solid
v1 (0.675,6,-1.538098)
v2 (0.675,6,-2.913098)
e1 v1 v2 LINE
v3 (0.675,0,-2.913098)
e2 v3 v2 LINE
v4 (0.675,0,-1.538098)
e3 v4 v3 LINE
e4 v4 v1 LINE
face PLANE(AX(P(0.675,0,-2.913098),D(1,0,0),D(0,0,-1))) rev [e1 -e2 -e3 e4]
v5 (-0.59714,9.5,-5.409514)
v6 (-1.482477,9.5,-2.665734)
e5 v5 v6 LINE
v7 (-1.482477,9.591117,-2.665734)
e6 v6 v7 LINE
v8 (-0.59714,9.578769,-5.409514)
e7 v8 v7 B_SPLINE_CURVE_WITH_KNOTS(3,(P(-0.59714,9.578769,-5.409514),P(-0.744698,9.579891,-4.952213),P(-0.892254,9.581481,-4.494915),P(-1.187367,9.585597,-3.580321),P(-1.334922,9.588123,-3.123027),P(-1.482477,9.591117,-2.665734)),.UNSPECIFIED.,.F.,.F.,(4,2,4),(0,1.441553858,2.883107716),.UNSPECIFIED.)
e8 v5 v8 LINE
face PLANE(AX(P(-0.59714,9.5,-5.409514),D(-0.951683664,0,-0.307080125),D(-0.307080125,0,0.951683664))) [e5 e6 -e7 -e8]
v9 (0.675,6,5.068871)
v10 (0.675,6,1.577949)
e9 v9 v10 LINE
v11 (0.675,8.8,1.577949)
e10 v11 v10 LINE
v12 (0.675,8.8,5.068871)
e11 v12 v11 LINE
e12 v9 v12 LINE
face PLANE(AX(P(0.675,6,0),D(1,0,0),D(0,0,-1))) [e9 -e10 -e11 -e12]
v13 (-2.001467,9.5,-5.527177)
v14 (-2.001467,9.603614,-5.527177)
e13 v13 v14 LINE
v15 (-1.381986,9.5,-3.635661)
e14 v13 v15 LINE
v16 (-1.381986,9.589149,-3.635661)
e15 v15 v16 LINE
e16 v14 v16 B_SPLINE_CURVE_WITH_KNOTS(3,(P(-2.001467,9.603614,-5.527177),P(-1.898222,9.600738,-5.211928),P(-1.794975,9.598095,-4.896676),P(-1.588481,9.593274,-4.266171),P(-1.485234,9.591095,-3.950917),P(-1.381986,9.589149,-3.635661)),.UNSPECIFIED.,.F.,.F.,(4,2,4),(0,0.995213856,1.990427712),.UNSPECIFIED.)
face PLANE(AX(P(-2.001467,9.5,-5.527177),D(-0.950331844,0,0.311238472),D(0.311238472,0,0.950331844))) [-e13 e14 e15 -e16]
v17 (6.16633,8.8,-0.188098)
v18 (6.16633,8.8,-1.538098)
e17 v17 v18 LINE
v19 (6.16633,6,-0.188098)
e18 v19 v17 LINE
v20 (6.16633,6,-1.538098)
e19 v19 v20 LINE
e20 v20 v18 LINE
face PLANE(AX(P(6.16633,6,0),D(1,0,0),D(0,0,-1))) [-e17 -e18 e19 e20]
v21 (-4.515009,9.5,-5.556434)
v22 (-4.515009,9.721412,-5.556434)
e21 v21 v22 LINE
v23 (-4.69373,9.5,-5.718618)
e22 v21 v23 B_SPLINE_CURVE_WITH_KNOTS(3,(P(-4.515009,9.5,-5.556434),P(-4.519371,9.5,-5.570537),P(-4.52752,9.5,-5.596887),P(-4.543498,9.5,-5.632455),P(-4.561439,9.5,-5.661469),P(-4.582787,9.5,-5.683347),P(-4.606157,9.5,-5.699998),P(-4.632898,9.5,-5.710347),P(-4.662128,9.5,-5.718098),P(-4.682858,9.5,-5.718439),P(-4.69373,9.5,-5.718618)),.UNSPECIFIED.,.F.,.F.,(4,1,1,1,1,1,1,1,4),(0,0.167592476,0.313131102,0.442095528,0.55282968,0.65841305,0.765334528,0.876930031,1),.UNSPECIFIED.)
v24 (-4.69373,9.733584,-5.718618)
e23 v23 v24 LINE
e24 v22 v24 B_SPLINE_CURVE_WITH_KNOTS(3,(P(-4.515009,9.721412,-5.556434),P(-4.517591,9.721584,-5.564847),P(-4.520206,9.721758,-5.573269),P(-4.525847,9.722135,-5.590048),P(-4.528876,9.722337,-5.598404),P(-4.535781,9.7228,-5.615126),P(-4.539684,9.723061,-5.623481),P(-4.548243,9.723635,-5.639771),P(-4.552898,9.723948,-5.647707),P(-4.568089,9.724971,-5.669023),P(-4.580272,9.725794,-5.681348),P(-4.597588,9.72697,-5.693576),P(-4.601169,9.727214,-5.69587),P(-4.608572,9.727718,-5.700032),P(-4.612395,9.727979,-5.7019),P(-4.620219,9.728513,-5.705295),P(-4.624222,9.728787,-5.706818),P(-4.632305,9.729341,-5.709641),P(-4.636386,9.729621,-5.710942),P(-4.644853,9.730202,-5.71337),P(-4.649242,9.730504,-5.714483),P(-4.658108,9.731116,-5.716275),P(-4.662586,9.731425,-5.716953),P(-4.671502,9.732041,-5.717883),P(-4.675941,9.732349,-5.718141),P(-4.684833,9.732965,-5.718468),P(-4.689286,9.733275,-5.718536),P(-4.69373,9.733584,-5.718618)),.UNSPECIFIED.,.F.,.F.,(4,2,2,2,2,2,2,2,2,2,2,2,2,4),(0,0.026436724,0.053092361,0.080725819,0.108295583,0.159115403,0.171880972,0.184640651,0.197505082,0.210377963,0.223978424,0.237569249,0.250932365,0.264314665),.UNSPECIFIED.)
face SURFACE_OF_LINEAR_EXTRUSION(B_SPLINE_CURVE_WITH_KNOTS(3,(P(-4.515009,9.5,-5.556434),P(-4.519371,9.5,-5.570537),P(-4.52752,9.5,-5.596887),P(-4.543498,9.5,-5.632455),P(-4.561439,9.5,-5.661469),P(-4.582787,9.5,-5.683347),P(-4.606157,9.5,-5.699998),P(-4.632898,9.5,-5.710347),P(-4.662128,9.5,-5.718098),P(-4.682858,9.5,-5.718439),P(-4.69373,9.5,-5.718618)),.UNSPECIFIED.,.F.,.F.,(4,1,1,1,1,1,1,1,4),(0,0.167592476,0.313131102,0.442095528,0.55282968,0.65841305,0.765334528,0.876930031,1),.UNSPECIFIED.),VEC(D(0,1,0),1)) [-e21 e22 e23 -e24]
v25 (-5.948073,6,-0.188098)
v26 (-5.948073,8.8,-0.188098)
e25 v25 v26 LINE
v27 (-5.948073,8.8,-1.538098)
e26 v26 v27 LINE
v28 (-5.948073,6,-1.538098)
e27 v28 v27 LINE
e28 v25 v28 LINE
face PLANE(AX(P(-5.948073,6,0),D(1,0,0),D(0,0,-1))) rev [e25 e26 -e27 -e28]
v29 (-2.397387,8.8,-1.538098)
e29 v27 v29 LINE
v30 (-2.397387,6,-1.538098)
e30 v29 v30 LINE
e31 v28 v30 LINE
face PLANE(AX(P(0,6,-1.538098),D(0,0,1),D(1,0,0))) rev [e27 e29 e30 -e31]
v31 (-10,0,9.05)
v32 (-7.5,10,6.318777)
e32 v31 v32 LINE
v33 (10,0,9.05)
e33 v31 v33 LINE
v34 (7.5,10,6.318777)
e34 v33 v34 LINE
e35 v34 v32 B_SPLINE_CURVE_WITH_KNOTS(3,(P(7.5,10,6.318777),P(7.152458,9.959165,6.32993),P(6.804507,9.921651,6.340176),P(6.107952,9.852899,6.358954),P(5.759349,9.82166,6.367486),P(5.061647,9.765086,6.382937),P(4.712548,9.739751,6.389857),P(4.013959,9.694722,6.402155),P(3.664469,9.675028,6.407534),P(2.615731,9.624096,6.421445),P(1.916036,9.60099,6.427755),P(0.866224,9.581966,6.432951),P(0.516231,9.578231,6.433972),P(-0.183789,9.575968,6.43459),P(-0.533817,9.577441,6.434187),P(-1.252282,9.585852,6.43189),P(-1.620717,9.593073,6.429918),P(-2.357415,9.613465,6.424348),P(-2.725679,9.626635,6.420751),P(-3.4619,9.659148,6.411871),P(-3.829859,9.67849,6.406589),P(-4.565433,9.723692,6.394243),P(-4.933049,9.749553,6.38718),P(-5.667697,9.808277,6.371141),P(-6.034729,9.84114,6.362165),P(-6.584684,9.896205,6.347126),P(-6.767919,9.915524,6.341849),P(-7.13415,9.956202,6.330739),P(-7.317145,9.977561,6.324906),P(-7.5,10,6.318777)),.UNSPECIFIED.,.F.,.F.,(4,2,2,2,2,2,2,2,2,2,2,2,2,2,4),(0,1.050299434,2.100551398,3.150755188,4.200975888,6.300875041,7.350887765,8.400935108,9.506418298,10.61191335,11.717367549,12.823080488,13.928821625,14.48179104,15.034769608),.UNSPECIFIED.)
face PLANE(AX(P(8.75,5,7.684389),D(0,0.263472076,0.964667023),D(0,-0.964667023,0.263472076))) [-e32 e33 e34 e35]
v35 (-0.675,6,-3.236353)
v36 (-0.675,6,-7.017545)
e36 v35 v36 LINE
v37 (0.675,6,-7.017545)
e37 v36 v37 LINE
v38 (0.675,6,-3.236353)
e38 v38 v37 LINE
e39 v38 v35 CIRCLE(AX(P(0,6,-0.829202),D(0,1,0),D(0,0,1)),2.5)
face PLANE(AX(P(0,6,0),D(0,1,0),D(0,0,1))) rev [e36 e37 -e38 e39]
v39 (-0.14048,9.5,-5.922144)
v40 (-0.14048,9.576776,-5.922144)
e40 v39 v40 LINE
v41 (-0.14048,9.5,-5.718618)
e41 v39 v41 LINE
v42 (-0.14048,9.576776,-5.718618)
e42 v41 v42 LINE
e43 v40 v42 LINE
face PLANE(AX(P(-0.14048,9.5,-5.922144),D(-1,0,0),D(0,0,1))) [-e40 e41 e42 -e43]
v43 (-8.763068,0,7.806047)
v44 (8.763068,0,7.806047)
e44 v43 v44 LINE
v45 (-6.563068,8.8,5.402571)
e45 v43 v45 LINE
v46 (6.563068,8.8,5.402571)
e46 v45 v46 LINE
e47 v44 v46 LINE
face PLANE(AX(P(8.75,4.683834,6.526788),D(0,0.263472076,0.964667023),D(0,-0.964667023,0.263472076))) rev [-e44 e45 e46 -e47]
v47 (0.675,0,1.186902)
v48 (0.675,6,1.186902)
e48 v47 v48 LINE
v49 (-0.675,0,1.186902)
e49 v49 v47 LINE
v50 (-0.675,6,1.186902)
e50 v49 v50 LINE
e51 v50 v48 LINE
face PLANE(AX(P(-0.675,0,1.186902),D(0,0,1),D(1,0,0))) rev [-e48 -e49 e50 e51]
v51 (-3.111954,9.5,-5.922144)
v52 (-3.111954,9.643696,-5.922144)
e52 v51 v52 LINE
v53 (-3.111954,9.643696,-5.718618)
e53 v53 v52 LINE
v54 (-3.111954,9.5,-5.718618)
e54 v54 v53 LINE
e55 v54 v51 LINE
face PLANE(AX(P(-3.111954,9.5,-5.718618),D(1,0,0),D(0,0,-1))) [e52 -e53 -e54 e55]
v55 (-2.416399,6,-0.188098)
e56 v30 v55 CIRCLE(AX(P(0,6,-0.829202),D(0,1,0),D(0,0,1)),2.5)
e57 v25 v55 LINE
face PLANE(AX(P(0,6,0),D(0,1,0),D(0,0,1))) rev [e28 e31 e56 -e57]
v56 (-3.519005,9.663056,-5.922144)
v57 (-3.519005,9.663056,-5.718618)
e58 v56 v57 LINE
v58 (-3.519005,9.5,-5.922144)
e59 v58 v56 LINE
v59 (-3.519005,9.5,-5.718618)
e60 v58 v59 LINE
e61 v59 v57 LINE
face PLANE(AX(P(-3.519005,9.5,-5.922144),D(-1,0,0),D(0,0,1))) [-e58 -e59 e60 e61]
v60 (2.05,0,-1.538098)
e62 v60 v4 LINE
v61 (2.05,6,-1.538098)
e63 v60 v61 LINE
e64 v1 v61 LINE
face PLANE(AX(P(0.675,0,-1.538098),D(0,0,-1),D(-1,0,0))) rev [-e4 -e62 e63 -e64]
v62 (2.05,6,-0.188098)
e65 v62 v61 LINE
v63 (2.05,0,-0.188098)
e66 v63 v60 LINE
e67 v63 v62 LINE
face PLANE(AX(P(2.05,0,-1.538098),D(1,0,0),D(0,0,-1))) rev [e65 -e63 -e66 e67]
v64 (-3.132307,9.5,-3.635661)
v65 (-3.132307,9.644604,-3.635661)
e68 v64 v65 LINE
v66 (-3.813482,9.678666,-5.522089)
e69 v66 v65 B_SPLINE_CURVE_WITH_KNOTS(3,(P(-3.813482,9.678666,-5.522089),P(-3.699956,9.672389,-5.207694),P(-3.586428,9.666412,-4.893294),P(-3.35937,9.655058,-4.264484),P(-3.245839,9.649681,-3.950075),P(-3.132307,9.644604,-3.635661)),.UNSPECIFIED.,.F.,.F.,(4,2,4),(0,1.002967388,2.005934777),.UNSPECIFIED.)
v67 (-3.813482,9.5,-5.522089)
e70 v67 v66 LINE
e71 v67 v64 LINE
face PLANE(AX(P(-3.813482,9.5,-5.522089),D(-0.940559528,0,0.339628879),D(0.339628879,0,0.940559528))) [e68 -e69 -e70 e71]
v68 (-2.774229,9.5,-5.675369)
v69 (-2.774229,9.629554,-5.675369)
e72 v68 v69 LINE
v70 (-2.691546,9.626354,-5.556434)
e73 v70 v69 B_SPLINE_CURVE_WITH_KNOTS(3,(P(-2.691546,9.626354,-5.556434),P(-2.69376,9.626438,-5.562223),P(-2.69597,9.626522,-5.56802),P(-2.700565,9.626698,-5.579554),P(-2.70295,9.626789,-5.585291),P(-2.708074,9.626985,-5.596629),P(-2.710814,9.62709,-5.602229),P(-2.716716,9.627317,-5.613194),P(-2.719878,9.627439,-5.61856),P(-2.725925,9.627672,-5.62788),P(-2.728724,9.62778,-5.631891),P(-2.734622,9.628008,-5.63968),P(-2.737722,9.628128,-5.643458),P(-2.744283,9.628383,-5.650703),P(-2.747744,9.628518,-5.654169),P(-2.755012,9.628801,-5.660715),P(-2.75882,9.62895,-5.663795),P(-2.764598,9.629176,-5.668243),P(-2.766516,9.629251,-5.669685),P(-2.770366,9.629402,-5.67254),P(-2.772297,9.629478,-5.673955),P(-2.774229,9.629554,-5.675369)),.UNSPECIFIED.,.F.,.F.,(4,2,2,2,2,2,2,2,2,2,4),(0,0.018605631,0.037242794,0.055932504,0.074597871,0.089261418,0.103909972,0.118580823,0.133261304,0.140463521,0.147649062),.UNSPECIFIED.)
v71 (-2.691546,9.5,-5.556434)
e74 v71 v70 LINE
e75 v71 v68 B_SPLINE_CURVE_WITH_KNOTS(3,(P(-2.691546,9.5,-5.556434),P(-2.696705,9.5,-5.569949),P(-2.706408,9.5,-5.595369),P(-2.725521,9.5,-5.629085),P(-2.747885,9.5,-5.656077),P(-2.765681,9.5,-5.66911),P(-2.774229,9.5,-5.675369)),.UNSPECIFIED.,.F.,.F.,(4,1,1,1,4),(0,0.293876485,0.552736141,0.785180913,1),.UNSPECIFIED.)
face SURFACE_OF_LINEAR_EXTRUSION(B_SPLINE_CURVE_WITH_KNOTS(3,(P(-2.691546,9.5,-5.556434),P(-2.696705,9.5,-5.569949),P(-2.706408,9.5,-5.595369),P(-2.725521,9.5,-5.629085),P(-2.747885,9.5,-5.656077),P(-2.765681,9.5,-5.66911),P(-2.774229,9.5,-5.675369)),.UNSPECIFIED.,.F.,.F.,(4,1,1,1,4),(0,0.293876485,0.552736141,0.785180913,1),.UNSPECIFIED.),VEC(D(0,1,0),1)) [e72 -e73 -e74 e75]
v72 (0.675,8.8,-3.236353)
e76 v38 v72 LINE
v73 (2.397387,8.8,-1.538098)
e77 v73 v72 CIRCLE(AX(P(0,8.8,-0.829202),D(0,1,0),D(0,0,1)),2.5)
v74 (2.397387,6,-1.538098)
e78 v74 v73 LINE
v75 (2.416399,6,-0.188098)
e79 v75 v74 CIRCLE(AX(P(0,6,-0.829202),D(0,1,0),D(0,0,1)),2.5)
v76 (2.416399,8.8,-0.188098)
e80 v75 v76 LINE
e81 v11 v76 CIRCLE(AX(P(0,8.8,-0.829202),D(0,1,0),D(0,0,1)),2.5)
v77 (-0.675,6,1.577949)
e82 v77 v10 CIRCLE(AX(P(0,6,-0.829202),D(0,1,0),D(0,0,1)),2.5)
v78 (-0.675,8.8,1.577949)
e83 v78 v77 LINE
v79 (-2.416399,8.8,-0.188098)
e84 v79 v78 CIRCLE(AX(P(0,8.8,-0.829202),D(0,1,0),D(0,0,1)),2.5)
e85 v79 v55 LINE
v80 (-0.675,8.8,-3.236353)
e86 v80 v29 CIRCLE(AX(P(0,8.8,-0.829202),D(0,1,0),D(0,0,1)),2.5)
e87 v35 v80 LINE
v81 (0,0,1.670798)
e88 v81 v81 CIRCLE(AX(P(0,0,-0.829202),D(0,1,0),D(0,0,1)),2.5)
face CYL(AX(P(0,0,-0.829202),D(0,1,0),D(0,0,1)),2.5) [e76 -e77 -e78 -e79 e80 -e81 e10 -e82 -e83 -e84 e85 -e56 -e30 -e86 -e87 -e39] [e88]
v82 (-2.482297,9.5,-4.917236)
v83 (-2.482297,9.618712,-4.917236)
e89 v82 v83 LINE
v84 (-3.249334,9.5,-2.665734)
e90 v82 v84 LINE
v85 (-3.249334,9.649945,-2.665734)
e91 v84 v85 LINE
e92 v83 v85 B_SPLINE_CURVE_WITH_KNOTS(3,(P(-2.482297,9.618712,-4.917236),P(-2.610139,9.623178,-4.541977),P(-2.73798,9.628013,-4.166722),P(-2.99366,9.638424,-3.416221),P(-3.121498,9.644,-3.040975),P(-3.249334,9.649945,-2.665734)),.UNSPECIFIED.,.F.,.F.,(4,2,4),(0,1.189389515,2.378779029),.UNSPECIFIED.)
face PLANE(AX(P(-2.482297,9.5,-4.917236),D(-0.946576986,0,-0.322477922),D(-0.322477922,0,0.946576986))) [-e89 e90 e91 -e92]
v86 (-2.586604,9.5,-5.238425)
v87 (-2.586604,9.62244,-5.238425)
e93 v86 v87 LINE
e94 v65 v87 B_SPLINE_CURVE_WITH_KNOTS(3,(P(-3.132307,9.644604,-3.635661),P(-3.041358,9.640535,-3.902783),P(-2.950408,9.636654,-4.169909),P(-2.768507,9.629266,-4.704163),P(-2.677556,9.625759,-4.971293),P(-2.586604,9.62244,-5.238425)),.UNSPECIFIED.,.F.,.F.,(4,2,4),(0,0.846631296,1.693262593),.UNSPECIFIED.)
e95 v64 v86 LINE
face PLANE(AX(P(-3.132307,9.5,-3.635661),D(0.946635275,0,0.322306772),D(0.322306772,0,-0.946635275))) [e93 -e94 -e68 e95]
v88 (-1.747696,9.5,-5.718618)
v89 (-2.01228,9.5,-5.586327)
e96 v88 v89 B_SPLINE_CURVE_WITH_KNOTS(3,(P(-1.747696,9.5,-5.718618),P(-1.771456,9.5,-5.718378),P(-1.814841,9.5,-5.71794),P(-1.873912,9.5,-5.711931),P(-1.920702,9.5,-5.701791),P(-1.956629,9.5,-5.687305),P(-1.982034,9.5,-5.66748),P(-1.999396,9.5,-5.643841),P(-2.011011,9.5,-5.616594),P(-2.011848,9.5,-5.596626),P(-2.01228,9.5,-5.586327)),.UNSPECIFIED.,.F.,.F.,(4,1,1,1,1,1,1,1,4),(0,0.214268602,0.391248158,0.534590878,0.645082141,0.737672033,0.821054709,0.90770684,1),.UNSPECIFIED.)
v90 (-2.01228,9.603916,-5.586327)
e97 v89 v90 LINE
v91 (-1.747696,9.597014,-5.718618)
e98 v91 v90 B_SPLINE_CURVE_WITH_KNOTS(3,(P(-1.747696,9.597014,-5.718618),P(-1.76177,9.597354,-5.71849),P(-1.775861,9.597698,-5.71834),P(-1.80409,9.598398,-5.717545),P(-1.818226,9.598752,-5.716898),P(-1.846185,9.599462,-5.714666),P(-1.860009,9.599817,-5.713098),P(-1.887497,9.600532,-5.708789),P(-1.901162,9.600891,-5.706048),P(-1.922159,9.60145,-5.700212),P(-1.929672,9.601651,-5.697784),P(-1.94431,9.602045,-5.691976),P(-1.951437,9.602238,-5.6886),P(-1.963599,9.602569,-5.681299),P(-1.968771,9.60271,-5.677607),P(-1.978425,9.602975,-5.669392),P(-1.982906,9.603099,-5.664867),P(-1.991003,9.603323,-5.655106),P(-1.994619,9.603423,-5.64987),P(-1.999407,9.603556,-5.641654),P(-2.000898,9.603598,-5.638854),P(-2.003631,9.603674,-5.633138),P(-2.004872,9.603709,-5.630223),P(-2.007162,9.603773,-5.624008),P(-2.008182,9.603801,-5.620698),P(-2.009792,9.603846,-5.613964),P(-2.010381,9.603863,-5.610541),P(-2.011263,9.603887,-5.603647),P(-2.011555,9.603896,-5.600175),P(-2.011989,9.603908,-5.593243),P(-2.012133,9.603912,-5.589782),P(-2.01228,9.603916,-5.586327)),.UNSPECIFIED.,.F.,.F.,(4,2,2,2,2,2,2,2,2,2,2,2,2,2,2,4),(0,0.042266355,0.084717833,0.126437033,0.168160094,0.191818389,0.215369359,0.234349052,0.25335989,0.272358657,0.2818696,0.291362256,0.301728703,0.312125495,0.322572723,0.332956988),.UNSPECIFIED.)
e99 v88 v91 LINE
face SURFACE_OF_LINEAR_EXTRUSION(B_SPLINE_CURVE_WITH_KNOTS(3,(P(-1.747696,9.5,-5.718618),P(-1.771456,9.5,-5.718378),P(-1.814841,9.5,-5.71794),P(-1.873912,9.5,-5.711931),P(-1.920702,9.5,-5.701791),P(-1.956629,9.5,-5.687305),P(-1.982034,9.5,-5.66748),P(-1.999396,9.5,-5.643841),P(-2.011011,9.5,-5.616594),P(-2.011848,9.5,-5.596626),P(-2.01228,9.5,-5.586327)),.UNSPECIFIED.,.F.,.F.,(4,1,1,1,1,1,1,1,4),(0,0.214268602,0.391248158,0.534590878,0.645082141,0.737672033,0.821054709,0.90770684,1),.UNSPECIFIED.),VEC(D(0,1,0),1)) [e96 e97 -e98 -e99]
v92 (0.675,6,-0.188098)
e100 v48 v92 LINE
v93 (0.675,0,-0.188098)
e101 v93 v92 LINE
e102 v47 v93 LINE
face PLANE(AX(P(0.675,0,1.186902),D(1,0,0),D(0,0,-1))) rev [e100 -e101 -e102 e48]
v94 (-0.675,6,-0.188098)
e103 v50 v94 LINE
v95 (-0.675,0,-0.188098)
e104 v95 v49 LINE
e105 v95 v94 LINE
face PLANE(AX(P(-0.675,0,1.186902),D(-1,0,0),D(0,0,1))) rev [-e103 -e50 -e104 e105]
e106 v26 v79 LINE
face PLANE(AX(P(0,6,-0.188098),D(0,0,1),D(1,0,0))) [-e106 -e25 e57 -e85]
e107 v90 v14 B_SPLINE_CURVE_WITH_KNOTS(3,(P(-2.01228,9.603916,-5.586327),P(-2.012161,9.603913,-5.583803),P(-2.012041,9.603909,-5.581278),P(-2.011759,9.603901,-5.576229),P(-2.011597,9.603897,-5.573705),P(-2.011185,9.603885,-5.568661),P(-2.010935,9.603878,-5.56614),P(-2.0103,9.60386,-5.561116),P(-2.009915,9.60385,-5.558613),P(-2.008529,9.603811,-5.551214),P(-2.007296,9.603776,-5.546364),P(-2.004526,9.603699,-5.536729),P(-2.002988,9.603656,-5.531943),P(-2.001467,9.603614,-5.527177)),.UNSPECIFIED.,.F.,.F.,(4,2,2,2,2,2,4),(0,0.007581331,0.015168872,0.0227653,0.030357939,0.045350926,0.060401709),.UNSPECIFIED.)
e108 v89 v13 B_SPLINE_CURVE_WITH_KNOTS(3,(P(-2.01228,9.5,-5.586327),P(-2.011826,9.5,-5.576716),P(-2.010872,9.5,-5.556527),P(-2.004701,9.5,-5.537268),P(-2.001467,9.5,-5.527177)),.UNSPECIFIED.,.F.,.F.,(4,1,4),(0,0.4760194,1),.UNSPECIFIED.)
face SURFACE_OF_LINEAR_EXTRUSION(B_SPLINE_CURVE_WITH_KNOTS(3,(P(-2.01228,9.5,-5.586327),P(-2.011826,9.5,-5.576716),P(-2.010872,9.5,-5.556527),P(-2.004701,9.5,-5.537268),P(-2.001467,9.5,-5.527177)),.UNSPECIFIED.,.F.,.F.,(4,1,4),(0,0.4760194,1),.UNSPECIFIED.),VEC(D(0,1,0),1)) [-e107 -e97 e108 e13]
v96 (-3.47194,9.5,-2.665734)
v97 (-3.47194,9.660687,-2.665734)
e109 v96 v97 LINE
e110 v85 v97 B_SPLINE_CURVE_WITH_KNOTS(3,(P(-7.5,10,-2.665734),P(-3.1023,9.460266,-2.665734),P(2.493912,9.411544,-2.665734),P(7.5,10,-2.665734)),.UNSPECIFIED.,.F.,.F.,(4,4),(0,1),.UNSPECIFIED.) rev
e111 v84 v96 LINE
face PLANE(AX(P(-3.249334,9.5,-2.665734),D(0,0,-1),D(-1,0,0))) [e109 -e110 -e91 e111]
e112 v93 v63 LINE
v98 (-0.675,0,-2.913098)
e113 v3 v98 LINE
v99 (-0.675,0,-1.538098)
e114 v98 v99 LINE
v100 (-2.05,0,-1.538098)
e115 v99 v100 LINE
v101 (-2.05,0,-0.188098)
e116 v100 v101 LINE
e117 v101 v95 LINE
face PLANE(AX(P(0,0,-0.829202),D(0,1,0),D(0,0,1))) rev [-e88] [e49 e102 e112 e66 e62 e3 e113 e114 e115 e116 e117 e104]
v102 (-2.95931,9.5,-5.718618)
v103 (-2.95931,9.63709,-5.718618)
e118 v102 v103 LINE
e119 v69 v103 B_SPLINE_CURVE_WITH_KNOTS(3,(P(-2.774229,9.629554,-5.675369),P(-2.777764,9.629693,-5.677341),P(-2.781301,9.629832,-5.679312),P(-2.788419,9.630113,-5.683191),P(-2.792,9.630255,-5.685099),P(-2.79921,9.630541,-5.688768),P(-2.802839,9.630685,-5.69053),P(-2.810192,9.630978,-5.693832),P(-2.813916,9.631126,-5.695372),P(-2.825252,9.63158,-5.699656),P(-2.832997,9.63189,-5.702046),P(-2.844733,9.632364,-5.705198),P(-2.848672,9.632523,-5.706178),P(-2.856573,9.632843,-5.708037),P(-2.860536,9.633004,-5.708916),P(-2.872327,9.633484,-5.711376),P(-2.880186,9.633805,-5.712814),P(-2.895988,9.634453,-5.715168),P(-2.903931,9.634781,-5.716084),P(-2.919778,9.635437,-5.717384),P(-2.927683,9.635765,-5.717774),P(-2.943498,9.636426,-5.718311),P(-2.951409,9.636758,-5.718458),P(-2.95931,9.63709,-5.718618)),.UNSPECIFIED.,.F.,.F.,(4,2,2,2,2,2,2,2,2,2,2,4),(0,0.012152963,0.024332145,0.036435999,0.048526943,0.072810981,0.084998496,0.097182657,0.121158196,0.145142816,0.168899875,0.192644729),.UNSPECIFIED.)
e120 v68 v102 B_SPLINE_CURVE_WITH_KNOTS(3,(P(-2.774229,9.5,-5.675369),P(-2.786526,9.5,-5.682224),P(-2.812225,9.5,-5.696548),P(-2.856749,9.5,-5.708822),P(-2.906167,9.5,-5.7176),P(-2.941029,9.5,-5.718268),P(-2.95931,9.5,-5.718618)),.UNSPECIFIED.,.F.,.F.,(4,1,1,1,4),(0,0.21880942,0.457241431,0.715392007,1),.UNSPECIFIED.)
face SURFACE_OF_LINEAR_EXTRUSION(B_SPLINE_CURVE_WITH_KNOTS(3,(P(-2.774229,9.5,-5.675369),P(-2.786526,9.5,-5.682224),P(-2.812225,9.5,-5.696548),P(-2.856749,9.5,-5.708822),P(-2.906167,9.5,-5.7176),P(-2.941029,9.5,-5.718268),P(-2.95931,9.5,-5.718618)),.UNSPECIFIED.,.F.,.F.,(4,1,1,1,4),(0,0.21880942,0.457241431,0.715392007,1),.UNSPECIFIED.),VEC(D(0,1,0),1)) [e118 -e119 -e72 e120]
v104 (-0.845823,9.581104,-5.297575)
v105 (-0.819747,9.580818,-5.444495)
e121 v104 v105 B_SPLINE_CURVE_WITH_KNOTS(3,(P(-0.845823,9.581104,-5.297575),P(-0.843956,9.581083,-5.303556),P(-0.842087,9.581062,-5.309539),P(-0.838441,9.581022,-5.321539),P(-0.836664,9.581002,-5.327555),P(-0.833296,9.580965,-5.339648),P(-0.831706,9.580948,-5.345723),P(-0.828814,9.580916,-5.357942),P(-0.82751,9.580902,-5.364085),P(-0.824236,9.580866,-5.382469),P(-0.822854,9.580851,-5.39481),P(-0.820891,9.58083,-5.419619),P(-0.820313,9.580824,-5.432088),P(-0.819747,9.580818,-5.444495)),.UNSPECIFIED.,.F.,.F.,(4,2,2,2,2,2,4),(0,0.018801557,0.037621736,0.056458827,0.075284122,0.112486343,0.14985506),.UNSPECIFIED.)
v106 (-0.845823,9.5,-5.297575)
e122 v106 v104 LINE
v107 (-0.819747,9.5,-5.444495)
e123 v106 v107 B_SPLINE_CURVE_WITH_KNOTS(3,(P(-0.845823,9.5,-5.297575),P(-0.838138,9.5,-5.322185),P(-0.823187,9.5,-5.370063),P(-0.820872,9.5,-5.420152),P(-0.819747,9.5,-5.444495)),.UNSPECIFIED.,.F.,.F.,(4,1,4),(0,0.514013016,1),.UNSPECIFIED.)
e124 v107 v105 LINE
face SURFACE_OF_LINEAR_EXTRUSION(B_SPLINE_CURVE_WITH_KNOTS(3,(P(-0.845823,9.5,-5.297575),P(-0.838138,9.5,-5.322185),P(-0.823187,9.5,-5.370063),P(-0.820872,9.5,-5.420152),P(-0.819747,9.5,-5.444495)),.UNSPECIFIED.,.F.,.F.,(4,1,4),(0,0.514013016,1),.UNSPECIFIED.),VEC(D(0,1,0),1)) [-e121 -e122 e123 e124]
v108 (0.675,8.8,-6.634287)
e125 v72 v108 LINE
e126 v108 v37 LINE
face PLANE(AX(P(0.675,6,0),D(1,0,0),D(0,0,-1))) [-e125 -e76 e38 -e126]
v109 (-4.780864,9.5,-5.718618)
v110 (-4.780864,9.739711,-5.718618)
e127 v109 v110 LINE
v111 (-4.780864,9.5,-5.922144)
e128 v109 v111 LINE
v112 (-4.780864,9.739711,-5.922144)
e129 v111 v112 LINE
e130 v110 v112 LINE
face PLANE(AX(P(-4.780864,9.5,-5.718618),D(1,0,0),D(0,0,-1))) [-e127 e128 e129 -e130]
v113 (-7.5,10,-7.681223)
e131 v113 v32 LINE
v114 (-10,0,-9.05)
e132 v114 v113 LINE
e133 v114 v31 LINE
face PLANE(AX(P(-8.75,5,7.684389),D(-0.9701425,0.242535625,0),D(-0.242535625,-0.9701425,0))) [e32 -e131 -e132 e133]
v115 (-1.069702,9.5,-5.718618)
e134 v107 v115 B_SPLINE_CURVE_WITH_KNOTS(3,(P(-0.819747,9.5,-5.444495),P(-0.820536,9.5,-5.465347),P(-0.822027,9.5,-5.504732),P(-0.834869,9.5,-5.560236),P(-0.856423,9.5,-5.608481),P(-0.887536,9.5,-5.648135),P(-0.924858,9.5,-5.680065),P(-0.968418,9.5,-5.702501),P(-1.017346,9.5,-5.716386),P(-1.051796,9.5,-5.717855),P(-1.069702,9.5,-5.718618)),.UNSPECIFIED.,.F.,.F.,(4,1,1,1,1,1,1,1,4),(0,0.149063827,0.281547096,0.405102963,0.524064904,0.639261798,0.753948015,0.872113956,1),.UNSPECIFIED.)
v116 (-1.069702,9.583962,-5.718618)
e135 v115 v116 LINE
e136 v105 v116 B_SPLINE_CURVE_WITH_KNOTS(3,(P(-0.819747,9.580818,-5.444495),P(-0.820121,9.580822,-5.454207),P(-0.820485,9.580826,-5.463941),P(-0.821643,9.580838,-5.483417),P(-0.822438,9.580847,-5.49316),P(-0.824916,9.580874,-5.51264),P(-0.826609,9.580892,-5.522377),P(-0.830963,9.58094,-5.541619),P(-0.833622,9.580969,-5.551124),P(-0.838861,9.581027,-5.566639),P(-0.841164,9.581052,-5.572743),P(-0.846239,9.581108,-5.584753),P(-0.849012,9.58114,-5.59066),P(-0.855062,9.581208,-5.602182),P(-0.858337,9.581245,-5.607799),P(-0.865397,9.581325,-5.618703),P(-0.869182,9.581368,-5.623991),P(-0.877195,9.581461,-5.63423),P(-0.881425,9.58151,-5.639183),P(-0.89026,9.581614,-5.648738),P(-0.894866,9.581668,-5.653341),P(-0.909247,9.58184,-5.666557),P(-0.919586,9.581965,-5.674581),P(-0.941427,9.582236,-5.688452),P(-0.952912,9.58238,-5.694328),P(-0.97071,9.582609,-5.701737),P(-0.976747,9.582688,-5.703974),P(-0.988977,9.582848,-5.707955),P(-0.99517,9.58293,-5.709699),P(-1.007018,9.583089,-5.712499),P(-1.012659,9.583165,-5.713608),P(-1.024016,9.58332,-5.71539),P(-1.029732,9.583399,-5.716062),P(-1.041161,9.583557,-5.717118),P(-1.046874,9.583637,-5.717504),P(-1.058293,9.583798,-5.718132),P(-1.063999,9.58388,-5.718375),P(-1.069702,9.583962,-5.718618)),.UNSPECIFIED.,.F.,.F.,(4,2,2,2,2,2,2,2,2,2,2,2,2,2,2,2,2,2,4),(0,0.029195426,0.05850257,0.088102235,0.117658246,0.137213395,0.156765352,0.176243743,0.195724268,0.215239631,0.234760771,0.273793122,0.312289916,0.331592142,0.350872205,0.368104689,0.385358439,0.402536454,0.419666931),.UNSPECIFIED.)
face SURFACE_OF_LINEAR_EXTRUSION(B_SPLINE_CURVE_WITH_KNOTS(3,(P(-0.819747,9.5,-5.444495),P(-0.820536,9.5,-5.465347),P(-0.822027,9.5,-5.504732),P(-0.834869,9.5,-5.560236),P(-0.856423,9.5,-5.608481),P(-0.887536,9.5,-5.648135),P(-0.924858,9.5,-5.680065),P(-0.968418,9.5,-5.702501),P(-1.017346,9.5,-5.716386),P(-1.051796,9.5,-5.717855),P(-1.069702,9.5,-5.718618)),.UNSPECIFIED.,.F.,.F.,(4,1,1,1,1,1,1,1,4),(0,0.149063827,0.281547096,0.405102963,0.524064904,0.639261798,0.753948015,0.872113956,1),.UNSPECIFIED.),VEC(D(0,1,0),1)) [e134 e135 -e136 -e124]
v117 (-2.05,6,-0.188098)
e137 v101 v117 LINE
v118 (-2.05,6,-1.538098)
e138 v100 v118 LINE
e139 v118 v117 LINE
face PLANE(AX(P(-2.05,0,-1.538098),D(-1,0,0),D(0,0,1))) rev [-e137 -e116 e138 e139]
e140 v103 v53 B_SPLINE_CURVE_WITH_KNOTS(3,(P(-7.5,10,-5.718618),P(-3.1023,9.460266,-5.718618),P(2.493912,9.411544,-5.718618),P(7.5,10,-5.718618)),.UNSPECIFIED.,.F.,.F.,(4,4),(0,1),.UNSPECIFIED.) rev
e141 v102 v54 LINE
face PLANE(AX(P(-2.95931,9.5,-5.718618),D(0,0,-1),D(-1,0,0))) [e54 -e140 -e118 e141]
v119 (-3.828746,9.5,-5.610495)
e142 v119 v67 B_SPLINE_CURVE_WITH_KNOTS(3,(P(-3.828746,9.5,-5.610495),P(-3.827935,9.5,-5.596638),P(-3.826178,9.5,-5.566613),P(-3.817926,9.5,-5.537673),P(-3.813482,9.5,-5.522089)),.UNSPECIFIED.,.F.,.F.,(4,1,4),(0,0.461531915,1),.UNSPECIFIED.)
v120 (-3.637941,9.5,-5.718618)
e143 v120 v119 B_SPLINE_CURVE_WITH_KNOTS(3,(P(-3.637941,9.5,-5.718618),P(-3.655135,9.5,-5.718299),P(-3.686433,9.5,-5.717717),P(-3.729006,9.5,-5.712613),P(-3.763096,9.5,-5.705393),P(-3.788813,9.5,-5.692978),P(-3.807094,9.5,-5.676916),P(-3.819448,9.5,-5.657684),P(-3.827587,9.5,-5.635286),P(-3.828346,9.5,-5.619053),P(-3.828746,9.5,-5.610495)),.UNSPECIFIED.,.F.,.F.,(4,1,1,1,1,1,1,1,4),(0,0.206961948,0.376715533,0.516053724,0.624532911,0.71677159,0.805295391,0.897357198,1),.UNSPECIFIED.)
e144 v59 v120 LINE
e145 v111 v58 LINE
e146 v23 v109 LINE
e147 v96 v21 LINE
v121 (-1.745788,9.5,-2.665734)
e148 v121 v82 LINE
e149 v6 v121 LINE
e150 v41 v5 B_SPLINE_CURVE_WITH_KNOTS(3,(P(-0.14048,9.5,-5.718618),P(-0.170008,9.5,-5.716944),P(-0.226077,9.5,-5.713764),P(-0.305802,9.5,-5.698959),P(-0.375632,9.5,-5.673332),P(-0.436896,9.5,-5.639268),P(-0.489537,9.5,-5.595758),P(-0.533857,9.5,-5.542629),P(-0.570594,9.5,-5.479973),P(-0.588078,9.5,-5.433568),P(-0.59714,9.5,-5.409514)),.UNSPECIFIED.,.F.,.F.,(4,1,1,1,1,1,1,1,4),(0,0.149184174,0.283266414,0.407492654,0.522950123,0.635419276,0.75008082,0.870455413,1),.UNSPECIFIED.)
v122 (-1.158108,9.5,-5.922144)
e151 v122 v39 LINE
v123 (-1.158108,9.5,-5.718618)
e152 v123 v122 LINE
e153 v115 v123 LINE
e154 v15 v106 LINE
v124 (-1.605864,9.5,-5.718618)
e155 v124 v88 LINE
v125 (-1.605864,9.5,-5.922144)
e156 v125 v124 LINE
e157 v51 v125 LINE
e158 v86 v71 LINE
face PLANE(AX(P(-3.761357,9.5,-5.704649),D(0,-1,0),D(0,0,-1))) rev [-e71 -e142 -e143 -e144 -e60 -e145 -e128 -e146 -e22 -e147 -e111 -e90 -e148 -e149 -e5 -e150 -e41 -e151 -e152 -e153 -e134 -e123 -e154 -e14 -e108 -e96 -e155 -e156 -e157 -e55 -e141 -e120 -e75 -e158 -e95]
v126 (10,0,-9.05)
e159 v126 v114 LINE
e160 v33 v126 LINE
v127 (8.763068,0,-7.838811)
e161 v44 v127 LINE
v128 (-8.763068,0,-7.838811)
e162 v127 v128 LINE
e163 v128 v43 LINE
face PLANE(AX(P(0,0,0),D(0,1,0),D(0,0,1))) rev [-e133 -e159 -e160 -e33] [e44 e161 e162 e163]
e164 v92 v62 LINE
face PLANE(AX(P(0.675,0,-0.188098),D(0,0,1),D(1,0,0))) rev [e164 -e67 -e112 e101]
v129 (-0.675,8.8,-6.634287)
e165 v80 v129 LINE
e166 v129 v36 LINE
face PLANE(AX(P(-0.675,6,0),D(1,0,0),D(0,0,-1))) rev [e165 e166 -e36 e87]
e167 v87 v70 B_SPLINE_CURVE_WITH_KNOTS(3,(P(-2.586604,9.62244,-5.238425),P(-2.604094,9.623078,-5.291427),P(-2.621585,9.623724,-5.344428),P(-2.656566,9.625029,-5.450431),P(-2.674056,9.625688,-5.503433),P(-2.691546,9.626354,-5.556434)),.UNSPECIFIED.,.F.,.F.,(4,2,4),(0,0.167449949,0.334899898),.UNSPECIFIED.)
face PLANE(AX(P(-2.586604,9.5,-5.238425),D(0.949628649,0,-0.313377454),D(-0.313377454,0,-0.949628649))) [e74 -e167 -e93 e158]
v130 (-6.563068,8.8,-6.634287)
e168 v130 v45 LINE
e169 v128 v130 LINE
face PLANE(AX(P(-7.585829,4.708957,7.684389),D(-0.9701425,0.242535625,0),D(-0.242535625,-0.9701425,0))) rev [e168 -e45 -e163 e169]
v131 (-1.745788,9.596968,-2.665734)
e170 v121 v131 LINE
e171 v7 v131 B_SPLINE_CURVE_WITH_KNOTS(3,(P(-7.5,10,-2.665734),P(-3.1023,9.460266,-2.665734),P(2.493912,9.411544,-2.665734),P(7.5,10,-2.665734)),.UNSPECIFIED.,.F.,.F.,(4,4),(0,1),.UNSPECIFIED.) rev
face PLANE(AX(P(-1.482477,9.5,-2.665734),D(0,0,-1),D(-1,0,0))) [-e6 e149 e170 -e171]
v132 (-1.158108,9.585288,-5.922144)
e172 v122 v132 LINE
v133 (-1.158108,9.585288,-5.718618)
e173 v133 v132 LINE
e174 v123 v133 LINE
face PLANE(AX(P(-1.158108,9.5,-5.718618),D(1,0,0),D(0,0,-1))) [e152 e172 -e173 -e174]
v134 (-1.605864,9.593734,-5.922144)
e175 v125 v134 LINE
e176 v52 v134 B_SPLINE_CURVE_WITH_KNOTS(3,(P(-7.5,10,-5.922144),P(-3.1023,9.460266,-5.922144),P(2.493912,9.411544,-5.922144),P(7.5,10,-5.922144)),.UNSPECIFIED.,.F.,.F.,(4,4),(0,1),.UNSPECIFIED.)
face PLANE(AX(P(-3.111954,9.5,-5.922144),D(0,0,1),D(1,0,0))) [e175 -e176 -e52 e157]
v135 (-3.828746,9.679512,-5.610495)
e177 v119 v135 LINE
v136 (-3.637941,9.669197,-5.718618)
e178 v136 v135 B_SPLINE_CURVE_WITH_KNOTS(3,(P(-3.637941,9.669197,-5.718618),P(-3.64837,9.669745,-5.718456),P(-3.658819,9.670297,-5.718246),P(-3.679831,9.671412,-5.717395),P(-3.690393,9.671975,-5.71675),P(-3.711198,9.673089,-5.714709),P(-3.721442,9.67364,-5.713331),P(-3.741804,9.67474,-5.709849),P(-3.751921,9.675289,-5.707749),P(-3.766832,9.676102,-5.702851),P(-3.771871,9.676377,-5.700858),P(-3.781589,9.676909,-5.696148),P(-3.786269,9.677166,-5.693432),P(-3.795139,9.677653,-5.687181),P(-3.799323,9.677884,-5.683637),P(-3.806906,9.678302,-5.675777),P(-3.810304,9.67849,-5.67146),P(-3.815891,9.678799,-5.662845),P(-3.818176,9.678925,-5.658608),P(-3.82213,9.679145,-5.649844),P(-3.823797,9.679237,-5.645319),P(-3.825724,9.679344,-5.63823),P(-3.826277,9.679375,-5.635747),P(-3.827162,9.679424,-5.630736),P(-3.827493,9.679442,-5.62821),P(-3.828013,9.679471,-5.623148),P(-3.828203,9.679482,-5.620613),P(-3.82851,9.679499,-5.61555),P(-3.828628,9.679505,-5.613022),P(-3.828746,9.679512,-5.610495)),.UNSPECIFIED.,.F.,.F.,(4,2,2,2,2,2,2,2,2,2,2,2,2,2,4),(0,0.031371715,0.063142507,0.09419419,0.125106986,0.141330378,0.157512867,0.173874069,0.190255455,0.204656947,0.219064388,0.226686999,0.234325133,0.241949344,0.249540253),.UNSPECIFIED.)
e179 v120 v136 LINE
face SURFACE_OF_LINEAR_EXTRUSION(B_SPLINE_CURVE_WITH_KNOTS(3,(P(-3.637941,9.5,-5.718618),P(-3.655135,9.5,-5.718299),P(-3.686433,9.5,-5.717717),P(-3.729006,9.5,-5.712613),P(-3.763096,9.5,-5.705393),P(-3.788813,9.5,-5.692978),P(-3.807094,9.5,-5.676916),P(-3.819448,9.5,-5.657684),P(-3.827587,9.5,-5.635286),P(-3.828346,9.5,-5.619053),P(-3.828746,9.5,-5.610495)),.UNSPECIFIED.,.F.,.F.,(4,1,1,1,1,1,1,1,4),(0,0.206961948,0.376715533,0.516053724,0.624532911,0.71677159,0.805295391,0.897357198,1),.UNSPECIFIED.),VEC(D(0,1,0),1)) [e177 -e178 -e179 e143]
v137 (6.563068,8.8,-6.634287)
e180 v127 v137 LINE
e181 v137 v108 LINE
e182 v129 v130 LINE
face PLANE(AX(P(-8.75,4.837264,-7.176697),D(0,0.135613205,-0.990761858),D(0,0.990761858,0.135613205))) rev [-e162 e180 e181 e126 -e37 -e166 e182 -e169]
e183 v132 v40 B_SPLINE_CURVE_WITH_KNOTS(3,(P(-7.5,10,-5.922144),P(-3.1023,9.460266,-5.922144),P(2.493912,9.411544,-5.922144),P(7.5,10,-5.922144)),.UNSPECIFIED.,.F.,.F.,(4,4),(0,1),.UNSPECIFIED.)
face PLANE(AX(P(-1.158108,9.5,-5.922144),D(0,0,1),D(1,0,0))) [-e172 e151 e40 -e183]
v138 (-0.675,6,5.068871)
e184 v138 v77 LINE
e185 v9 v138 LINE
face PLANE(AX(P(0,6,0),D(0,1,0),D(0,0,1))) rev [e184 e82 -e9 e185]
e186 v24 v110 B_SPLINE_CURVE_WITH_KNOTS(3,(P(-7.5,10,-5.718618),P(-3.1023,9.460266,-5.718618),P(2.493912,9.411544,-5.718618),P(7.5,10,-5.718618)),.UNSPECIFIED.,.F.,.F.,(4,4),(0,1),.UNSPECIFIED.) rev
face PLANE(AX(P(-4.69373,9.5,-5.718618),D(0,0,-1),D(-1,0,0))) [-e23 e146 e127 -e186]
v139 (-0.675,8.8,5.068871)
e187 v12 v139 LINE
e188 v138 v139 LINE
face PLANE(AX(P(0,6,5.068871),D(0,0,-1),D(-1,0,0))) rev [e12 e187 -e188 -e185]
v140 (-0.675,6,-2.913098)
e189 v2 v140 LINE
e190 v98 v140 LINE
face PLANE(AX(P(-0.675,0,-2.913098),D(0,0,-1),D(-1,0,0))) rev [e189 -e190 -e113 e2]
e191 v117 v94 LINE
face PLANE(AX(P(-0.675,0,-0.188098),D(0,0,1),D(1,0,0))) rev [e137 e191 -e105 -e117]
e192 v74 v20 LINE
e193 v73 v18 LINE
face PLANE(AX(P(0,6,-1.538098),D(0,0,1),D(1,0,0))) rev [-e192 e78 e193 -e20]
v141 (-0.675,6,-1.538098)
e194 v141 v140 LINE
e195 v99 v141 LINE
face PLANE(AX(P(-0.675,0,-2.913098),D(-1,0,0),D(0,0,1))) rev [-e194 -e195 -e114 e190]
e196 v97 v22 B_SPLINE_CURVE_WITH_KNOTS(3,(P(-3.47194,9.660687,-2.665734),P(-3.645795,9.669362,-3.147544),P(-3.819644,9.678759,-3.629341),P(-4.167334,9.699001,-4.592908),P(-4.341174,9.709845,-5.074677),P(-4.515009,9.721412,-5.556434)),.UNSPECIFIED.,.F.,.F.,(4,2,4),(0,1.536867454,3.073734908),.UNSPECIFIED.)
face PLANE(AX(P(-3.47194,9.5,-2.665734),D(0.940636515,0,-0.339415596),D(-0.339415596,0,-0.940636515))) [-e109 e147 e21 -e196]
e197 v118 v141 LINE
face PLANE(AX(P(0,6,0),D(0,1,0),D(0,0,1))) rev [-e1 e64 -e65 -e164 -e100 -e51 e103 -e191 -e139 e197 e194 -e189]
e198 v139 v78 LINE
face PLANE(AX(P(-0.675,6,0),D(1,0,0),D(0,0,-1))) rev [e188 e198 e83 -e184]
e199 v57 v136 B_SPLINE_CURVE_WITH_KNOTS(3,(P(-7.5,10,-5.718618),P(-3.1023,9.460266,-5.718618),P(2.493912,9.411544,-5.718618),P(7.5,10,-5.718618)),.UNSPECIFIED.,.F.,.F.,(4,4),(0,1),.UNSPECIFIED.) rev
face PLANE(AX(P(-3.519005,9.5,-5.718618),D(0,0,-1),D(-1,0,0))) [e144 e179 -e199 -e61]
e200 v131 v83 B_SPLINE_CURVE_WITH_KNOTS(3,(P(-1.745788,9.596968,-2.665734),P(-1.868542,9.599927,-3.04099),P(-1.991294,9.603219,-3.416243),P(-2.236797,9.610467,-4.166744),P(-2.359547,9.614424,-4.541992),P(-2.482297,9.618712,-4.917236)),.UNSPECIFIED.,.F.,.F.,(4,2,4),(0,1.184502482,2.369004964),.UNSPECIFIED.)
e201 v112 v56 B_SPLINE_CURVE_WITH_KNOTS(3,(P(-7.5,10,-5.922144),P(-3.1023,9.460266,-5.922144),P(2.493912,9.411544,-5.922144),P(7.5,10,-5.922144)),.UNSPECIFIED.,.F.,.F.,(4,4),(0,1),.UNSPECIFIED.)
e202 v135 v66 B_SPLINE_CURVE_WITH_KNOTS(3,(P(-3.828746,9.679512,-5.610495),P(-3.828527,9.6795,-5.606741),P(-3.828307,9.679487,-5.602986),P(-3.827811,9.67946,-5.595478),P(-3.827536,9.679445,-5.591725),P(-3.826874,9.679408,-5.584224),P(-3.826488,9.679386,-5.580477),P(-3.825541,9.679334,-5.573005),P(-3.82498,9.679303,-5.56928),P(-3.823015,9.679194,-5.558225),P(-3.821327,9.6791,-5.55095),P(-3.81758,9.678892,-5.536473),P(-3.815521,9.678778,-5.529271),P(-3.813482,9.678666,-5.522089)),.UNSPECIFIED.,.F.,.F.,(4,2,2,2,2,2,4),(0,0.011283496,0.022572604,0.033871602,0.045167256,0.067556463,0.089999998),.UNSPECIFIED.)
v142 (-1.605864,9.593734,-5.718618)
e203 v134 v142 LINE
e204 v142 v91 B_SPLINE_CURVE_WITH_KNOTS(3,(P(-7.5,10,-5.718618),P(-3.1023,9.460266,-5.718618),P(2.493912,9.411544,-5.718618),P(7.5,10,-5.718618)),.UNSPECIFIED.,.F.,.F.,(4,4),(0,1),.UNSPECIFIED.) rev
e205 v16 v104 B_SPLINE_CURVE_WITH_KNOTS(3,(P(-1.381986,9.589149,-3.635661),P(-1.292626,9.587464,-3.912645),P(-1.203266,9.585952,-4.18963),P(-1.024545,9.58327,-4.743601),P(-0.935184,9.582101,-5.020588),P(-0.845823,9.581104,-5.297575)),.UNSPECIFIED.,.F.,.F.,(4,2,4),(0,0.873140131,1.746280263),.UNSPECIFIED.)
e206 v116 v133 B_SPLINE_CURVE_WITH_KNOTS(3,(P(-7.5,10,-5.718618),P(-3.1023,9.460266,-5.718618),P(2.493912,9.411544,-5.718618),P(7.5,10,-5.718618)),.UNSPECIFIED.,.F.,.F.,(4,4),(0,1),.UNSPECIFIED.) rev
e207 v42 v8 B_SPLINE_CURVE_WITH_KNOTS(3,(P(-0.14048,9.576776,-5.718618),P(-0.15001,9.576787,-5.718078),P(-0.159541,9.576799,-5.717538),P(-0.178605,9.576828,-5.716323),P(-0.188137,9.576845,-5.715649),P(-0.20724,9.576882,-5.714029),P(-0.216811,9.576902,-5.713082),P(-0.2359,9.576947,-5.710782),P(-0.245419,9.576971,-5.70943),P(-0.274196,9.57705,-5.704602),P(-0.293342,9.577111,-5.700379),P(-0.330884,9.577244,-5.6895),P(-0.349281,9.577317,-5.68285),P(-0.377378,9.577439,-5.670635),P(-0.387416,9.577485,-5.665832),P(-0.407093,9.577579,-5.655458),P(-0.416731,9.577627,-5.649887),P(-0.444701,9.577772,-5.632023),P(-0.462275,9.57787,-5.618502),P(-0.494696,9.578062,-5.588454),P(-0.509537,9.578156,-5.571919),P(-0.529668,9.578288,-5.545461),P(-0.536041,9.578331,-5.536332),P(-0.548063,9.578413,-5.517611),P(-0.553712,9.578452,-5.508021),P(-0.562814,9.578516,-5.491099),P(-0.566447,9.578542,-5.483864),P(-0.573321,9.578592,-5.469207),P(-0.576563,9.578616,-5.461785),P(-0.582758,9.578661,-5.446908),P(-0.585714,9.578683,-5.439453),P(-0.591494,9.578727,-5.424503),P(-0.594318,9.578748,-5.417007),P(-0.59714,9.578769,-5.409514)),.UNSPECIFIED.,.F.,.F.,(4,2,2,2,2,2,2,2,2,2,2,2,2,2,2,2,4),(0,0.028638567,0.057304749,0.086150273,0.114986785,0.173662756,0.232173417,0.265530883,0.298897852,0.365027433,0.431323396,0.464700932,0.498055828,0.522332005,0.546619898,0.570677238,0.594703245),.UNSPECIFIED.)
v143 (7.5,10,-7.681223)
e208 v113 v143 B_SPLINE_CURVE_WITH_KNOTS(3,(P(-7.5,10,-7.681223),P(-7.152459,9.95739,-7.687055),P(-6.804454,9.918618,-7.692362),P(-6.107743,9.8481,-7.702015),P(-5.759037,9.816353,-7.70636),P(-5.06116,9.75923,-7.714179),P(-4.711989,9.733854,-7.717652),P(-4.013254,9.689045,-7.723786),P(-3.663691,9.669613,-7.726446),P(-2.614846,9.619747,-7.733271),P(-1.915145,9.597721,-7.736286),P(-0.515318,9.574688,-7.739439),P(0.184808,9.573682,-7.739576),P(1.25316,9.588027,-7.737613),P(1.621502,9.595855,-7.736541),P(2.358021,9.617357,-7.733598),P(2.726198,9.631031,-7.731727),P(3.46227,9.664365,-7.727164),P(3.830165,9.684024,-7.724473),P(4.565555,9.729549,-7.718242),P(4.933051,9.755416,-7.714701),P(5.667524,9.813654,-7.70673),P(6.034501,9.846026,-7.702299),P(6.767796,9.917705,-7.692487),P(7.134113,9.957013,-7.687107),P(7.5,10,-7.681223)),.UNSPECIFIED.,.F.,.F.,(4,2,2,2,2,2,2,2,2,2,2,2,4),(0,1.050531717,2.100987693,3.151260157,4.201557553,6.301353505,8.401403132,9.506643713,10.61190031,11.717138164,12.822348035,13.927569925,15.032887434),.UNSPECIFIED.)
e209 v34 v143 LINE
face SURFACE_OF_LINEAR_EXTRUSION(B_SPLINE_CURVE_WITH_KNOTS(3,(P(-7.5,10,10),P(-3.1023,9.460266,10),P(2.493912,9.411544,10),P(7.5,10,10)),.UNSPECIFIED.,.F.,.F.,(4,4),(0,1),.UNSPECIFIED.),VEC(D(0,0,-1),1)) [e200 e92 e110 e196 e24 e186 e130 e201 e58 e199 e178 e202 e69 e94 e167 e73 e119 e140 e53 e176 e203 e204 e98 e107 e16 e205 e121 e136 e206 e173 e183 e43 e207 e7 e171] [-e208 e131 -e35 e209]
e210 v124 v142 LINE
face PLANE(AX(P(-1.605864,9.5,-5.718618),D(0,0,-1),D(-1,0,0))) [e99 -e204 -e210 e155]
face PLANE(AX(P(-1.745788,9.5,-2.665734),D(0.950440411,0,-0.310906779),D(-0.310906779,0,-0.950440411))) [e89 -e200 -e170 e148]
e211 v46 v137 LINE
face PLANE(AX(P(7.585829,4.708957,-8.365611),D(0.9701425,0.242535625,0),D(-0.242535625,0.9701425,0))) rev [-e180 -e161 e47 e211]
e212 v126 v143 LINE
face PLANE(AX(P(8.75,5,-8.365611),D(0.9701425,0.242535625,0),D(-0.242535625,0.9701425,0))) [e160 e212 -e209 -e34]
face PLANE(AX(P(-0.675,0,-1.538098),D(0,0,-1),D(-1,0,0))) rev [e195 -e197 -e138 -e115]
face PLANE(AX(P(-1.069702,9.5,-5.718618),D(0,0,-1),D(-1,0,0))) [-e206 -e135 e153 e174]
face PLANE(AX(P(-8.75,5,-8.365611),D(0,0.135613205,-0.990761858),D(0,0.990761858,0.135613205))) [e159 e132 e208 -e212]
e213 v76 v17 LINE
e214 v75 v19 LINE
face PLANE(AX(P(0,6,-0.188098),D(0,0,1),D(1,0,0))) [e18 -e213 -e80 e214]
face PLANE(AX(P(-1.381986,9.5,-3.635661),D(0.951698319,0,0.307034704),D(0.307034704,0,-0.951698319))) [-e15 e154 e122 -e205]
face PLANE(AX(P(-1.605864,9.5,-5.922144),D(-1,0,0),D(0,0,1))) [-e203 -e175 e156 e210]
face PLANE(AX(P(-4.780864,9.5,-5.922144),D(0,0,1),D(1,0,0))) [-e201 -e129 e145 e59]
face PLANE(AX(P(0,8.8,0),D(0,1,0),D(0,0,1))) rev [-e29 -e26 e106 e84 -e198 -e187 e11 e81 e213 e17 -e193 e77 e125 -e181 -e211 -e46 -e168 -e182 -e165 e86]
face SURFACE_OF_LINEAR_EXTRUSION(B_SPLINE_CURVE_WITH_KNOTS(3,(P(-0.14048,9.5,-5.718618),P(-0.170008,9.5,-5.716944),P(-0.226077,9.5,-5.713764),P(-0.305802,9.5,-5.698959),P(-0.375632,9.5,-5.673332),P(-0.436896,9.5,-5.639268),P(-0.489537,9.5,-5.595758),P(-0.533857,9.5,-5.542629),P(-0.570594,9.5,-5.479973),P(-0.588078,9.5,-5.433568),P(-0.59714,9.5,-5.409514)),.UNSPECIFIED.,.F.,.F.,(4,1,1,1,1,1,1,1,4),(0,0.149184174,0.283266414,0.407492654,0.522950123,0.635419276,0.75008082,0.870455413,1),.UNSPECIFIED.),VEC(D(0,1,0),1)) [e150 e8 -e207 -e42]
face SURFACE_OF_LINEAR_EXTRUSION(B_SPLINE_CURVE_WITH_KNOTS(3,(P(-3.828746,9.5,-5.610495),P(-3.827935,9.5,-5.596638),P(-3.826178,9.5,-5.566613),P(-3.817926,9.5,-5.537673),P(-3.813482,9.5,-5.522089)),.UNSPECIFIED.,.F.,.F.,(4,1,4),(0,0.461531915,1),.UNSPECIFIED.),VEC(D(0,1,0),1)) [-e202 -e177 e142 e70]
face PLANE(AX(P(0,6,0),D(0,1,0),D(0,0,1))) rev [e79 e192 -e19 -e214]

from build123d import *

# Parameters (mm, degrees)
SHELL1_T                = -1.2
SKETCH5_W               = 1.35
SKETCH5_H               = 5.256968873
SKETCH5_H_2             = 1.35
SKETCH5_W_2             = 5.491330354
SKETCH5_W_3             = 5.273072972
SKETCH5_H_3             = 5.618351113
BOSS_EXTRUDE1_DEPTH     = 4
SKETCH6_R               = 2.5
BOSS_EXTRUDE2_DEPTH     = 10
CUT_EXTRUDE3_DEPTH      = 10
CUT_EXTRUDE3_DEPTH_BACK = 10
CUT_EXTRUDE4_DEPTH      = 0.5


with BuildPart() as part:
    # Loft1: read off the stored shape, not the designer's step
    # Loft1: loft between two sections, ruled curve by curve
    loft1_from = [
        Edge.make_line((-10, 0, 9.05), (-10, 0, -9.05)),
        Edge.make_line((-10, 0, -9.05), (10, 0, -9.05)),
        Edge.make_line((10, 0, 9.05), (-10, 0, 9.05)),
        Edge.make_line((10, 0, -9.05), (10, 0, 9.05)),
    ]
    loft1_to = [
        Edge.make_line((-7.5, 10, 6.318777005), (-7.5, 10, -7.681222995)),
        Edge.make_line((-7.5, 10, -7.681222995), (7.5, 10, -7.681222995)),
        Edge.make_line((7.5, 10, 6.318777005), (-7.5, 10, 6.318777005)),
        Edge.make_line((7.5, 10, -7.681222995), (7.5, 10, 6.318777005)),
    ]
    loft1 = Solid(Shell([*[Face.make_surface_from_curves(loft1_from[k], loft1_to[k]) for k in range(4)], Face(Wire(loft1_from)), Face(Wire(loft1_to))]))
    add(loft1)

    # Shell1
    shell1_openings = [part.faces().sort_by_distance(p)[0] for p in [
        (0, 0, 0),
    ]]
    offset(amount=SHELL1_T, openings=shell1_openings, kind=Kind.INTERSECTION)

    # Sketch5 → Boss-Extrude1 (add)
    with BuildSketch(Plane(origin=(0, 10, 0), x_dir=(1, 0, 0), z_dir=(0, 1, 0))):
        with Locations((0, -2.44038684)):
            Rectangle(SKETCH5_W, SKETCH5_H)
        with Locations((0, 0.863097596)):
            Rectangle(SKETCH5_W, SKETCH5_H_2)
        with Locations((3.420665177, 0.863097596)):
            Rectangle(SKETCH5_W_2, SKETCH5_H_2)
        with Locations((-3.311536486, 0.863097596)):
            Rectangle(SKETCH5_W_3, SKETCH5_H_2)
        with Locations((0, 4.347273152)):
            Rectangle(SKETCH5_W, SKETCH5_H_3)
    extrude(amount=-BOSS_EXTRUDE1_DEPTH)

    # Sketch6 → Boss-Extrude2 (add)
    with BuildSketch(Plane(origin=(0, 10, 0), x_dir=(1, 0, 0), z_dir=(0, 1, 0))):
        with Locations(Location((0, 0.829201721, 0), (0, 0, 270))):
            Circle(SKETCH6_R)
        Polygon((-0.675, 2.913097596), (-0.675, 1.538097596), (-2.05, 1.538097596), (-2.05, 0.188097596), (-0.675, 0.188097596), (-0.675, -1.186902404), (0.675, -1.186902404), (0.675, 0.188097596), (2.05, 0.188097596), (2.05, 1.538097596), (0.675, 1.538097596), (0.675, 2.913097596), align=None, mode=Mode.SUBTRACT)
    extrude(amount=-BOSS_EXTRUDE2_DEPTH)

    # Sketch4 → Cut-Extrude3 (cut, two sides: drawn at the far end of the back side and taken through both)
    with BuildSketch(Plane.XY.offset(-CUT_EXTRUDE3_DEPTH_BACK)):
        with BuildLine():
            Line((-7.5, 10), (7.5, 10))
            add(Edge.make_bspline(
                [(-7.5, 10), (-3.102300298, 9.460265696), (2.493912061, 9.41154423), (7.5, 10)],
                knots=[0, 0, 0, 0, 1, 1, 1, 1], degree=3))
        make_face()
    extrude(amount=CUT_EXTRUDE3_DEPTH + CUT_EXTRUDE3_DEPTH_BACK, mode=Mode.SUBTRACT)

    # Sketch7 → Cut-Extrude4 (cut)
    with BuildSketch(Plane(origin=(0, 10, 0), x_dir=(1, 0, 0), z_dir=(0, 1, 0))):
        with BuildLine():
            Line((-4.780864366, 5.922144036), (-3.519005391, 5.922144036))
            Line((-3.519005391, 5.922144036), (-3.519005391, 5.718618395))
            Line((-3.519005391, 5.718618395), (-3.637940688, 5.718618395))
            add(Edge.make_bspline(
                [(-3.637940688, 5.718618395), (-3.655135293, 5.718298675), (-3.686433195, 5.717716715), (-3.729006145, 5.712612802), (-3.763096016, 5.705393375), (-3.78881293, 5.692977812), (-3.8070942, 5.676915533), (-3.819447693, 5.657684085), (-3.827587368, 5.635286205), (-3.828346031, 5.619053057), (-3.828745976, 5.610495398)],
                knots=[0, 0, 0, 0, 1.655695587, 3.013724266, 4.12842979, 4.996263288, 5.734172721, 6.442363129, 7.178857587, 8, 8, 8, 8], degree=3))
            add(Edge.make_bspline(
                [(-3.828745976, 5.610495398), (-3.827935202, 5.596638054), (-3.8261785, 5.566613383), (-3.81792552, 5.537672623), (-3.813481553, 5.522088947)],
                knots=[0, 0, 0, 0, 0.92306383, 2, 2, 2, 2], degree=3))
            Line((-3.813481553, 5.522088947), (-3.132306673, 3.635660662))
            Line((-3.132306673, 3.635660662), (-2.586603548, 5.238425085))
            Line((-2.586603548, 5.238425085), (-2.691546457, 5.556433899))
            add(Edge.make_bspline(
                [(-2.691546457, 5.556433899), (-2.696705028, 5.569949091), (-2.7064075, 5.595369072), (-2.725520717, 5.629084688), (-2.747885349, 5.656076509), (-2.765681383, 5.669109501), (-2.774228749, 5.675369196)],
                knots=[0, 0, 0, 0, 1.175505941, 2.210944564, 3.140723652, 4, 4, 4, 4], degree=3))
            add(Edge.make_bspline(
                [(-2.774228749, 5.675369196), (-2.786526434, 5.682223978), (-2.812224647, 5.696548271), (-2.856749443, 5.708822147), (-2.906166524, 5.717600207), (-2.941028957, 5.718268145), (-2.959309879, 5.718618395)],
                knots=[0, 0, 0, 0, 0.875237679, 1.828965724, 2.861568027, 4, 4, 4, 4], degree=3))
            Line((-2.959309879, 5.718618395), (-3.111954109, 5.718618395))
            Line((-3.111954109, 5.718618395), (-3.111954109, 5.922144036))
            Line((-3.111954109, 5.922144036), (-1.605864366, 5.922144036))
            Line((-1.605864366, 5.922144036), (-1.605864366, 5.718618395))
            Line((-1.605864366, 5.718618395), (-1.747696297, 5.718618395))
            add(Edge.make_bspline(
                [(-1.747696297, 5.718618395), (-1.771456323, 5.718378199), (-1.814841431, 5.717939609), (-1.873911631, 5.711930572), (-1.920702063, 5.701790817), (-1.956628554, 5.687304501), (-1.982034107, 5.667479747), (-1.999396203, 5.643840507), (-2.011010812, 5.616593715), (-2.011847895, 5.596625547), (-2.01227963, 5.586326728)],
                knots=[0, 0, 0, 0, 1.714148818, 3.129985267, 4.276727023, 5.160657128, 5.901376261, 6.568437672, 7.261654719, 8, 8, 8, 8], degree=3))
            add(Edge.make_bspline(
                [(-2.01227963, 5.586326728), (-2.011825699, 5.576716145), (-2.010872101, 5.556526669), (-2.004700913, 5.537268169), (-2.001467331, 5.527177089)],
                knots=[0, 0, 0, 0, 0.952038799, 2, 2, 2, 2], degree=3))
            Line((-2.001467331, 5.527177089), (-1.381986161, 3.635660662))
            Line((-1.381986161, 3.635660662), (-0.8458233, 5.297574725))
            add(Edge.make_bspline(
                [(-0.8458233, 5.297574725), (-0.838138315, 5.322184666), (-0.82318736, 5.370062717), (-0.820871874, 5.420152039), (-0.819746577, 5.444494797)],
                knots=[0, 0, 0, 0, 1.028026033, 2, 2, 2, 2], degree=3))
            add(Edge.make_bspline(
                [(-0.819746577, 5.444494797), (-0.820535966, 5.465347045), (-0.822026939, 5.50473212), (-0.834869187, 5.560235902), (-0.856422532, 5.608480656), (-0.887535554, 5.648134893), (-0.924858201, 5.68006508), (-0.968418499, 5.702501412), (-1.017345761, 5.71638575), (-1.051795947, 5.717854835), (-1.069701505, 5.718618395)],
                knots=[0, 0, 0, 0, 1.192510613, 2.252376767, 3.240823701, 4.19251923, 5.11409438, 6.031584123, 6.976911646, 8, 8, 8, 8], degree=3))
            Line((-1.069701505, 5.718618395), (-1.158107956, 5.718618395))
            Line((-1.158107956, 5.718618395), (-1.158107956, 5.922144036))
            Line((-1.158107956, 5.922144036), (-0.14047975, 5.922144036))
            Line((-0.14047975, 5.922144036), (-0.14047975, 5.718618395))
            add(Edge.make_bspline(
                [(-0.14047975, 5.718618395), (-0.17000843, 5.716943894), (-0.226076597, 5.713764403), (-0.305801986, 5.6989593), (-0.375631822, 5.673331733), (-0.436896235, 5.639267674), (-0.489536795, 5.595758006), (-0.533856822, 5.542629255), (-0.570593733, 5.479973415), (-0.588077676, 5.433567924), (-0.597140407, 5.409513827)],
                knots=[0, 0, 0, 0, 1.193473395, 2.266131314, 3.259941233, 4.183600984, 5.083354208, 6.00064656, 6.963643304, 8, 8, 8, 8], degree=3))
            Line((-0.597140407, 5.409513827), (-1.482476946, 2.665733779))
            Line((-1.482476946, 2.665733779), (-1.745788244, 2.665733779))
            Line((-1.745788244, 2.665733779), (-2.482296657, 4.917236183))
            Line((-2.482296657, 4.917236183), (-3.249333917, 2.665733779))
            Line((-3.249333917, 2.665733779), (-3.471940087, 2.665733779))
            Line((-3.471940087, 2.665733779), (-4.515008997, 5.556433899))
            add(Edge.make_bspline(
                [(-4.515008997, 5.556433899), (-4.51937065, 5.570536793), (-4.527519997, 5.596886752), (-4.543498142, 5.632455097), (-4.561438603, 5.66146931), (-4.582786932, 5.683346509), (-4.606156722, 5.69999819), (-4.632897529, 5.710346771), (-4.662128217, 5.718097638), (-4.682858161, 5.718439241), (-4.693729951, 5.718618395)],
                knots=[0, 0, 0, 0, 1.34073981, 2.505048815, 3.536764225, 4.422637444, 5.267304403, 6.122676221, 7.015440249, 8, 8, 8, 8], degree=3))
            Line((-4.693729951, 5.718618395), (-4.780864366, 5.718618395))
            Line((-4.780864366, 5.718618395), (-4.780864366, 5.922144036))
        make_face()
    extrude(amount=-CUT_EXTRUDE4_DEPTH, mode=Mode.SUBTRACT)


solid = part.part
